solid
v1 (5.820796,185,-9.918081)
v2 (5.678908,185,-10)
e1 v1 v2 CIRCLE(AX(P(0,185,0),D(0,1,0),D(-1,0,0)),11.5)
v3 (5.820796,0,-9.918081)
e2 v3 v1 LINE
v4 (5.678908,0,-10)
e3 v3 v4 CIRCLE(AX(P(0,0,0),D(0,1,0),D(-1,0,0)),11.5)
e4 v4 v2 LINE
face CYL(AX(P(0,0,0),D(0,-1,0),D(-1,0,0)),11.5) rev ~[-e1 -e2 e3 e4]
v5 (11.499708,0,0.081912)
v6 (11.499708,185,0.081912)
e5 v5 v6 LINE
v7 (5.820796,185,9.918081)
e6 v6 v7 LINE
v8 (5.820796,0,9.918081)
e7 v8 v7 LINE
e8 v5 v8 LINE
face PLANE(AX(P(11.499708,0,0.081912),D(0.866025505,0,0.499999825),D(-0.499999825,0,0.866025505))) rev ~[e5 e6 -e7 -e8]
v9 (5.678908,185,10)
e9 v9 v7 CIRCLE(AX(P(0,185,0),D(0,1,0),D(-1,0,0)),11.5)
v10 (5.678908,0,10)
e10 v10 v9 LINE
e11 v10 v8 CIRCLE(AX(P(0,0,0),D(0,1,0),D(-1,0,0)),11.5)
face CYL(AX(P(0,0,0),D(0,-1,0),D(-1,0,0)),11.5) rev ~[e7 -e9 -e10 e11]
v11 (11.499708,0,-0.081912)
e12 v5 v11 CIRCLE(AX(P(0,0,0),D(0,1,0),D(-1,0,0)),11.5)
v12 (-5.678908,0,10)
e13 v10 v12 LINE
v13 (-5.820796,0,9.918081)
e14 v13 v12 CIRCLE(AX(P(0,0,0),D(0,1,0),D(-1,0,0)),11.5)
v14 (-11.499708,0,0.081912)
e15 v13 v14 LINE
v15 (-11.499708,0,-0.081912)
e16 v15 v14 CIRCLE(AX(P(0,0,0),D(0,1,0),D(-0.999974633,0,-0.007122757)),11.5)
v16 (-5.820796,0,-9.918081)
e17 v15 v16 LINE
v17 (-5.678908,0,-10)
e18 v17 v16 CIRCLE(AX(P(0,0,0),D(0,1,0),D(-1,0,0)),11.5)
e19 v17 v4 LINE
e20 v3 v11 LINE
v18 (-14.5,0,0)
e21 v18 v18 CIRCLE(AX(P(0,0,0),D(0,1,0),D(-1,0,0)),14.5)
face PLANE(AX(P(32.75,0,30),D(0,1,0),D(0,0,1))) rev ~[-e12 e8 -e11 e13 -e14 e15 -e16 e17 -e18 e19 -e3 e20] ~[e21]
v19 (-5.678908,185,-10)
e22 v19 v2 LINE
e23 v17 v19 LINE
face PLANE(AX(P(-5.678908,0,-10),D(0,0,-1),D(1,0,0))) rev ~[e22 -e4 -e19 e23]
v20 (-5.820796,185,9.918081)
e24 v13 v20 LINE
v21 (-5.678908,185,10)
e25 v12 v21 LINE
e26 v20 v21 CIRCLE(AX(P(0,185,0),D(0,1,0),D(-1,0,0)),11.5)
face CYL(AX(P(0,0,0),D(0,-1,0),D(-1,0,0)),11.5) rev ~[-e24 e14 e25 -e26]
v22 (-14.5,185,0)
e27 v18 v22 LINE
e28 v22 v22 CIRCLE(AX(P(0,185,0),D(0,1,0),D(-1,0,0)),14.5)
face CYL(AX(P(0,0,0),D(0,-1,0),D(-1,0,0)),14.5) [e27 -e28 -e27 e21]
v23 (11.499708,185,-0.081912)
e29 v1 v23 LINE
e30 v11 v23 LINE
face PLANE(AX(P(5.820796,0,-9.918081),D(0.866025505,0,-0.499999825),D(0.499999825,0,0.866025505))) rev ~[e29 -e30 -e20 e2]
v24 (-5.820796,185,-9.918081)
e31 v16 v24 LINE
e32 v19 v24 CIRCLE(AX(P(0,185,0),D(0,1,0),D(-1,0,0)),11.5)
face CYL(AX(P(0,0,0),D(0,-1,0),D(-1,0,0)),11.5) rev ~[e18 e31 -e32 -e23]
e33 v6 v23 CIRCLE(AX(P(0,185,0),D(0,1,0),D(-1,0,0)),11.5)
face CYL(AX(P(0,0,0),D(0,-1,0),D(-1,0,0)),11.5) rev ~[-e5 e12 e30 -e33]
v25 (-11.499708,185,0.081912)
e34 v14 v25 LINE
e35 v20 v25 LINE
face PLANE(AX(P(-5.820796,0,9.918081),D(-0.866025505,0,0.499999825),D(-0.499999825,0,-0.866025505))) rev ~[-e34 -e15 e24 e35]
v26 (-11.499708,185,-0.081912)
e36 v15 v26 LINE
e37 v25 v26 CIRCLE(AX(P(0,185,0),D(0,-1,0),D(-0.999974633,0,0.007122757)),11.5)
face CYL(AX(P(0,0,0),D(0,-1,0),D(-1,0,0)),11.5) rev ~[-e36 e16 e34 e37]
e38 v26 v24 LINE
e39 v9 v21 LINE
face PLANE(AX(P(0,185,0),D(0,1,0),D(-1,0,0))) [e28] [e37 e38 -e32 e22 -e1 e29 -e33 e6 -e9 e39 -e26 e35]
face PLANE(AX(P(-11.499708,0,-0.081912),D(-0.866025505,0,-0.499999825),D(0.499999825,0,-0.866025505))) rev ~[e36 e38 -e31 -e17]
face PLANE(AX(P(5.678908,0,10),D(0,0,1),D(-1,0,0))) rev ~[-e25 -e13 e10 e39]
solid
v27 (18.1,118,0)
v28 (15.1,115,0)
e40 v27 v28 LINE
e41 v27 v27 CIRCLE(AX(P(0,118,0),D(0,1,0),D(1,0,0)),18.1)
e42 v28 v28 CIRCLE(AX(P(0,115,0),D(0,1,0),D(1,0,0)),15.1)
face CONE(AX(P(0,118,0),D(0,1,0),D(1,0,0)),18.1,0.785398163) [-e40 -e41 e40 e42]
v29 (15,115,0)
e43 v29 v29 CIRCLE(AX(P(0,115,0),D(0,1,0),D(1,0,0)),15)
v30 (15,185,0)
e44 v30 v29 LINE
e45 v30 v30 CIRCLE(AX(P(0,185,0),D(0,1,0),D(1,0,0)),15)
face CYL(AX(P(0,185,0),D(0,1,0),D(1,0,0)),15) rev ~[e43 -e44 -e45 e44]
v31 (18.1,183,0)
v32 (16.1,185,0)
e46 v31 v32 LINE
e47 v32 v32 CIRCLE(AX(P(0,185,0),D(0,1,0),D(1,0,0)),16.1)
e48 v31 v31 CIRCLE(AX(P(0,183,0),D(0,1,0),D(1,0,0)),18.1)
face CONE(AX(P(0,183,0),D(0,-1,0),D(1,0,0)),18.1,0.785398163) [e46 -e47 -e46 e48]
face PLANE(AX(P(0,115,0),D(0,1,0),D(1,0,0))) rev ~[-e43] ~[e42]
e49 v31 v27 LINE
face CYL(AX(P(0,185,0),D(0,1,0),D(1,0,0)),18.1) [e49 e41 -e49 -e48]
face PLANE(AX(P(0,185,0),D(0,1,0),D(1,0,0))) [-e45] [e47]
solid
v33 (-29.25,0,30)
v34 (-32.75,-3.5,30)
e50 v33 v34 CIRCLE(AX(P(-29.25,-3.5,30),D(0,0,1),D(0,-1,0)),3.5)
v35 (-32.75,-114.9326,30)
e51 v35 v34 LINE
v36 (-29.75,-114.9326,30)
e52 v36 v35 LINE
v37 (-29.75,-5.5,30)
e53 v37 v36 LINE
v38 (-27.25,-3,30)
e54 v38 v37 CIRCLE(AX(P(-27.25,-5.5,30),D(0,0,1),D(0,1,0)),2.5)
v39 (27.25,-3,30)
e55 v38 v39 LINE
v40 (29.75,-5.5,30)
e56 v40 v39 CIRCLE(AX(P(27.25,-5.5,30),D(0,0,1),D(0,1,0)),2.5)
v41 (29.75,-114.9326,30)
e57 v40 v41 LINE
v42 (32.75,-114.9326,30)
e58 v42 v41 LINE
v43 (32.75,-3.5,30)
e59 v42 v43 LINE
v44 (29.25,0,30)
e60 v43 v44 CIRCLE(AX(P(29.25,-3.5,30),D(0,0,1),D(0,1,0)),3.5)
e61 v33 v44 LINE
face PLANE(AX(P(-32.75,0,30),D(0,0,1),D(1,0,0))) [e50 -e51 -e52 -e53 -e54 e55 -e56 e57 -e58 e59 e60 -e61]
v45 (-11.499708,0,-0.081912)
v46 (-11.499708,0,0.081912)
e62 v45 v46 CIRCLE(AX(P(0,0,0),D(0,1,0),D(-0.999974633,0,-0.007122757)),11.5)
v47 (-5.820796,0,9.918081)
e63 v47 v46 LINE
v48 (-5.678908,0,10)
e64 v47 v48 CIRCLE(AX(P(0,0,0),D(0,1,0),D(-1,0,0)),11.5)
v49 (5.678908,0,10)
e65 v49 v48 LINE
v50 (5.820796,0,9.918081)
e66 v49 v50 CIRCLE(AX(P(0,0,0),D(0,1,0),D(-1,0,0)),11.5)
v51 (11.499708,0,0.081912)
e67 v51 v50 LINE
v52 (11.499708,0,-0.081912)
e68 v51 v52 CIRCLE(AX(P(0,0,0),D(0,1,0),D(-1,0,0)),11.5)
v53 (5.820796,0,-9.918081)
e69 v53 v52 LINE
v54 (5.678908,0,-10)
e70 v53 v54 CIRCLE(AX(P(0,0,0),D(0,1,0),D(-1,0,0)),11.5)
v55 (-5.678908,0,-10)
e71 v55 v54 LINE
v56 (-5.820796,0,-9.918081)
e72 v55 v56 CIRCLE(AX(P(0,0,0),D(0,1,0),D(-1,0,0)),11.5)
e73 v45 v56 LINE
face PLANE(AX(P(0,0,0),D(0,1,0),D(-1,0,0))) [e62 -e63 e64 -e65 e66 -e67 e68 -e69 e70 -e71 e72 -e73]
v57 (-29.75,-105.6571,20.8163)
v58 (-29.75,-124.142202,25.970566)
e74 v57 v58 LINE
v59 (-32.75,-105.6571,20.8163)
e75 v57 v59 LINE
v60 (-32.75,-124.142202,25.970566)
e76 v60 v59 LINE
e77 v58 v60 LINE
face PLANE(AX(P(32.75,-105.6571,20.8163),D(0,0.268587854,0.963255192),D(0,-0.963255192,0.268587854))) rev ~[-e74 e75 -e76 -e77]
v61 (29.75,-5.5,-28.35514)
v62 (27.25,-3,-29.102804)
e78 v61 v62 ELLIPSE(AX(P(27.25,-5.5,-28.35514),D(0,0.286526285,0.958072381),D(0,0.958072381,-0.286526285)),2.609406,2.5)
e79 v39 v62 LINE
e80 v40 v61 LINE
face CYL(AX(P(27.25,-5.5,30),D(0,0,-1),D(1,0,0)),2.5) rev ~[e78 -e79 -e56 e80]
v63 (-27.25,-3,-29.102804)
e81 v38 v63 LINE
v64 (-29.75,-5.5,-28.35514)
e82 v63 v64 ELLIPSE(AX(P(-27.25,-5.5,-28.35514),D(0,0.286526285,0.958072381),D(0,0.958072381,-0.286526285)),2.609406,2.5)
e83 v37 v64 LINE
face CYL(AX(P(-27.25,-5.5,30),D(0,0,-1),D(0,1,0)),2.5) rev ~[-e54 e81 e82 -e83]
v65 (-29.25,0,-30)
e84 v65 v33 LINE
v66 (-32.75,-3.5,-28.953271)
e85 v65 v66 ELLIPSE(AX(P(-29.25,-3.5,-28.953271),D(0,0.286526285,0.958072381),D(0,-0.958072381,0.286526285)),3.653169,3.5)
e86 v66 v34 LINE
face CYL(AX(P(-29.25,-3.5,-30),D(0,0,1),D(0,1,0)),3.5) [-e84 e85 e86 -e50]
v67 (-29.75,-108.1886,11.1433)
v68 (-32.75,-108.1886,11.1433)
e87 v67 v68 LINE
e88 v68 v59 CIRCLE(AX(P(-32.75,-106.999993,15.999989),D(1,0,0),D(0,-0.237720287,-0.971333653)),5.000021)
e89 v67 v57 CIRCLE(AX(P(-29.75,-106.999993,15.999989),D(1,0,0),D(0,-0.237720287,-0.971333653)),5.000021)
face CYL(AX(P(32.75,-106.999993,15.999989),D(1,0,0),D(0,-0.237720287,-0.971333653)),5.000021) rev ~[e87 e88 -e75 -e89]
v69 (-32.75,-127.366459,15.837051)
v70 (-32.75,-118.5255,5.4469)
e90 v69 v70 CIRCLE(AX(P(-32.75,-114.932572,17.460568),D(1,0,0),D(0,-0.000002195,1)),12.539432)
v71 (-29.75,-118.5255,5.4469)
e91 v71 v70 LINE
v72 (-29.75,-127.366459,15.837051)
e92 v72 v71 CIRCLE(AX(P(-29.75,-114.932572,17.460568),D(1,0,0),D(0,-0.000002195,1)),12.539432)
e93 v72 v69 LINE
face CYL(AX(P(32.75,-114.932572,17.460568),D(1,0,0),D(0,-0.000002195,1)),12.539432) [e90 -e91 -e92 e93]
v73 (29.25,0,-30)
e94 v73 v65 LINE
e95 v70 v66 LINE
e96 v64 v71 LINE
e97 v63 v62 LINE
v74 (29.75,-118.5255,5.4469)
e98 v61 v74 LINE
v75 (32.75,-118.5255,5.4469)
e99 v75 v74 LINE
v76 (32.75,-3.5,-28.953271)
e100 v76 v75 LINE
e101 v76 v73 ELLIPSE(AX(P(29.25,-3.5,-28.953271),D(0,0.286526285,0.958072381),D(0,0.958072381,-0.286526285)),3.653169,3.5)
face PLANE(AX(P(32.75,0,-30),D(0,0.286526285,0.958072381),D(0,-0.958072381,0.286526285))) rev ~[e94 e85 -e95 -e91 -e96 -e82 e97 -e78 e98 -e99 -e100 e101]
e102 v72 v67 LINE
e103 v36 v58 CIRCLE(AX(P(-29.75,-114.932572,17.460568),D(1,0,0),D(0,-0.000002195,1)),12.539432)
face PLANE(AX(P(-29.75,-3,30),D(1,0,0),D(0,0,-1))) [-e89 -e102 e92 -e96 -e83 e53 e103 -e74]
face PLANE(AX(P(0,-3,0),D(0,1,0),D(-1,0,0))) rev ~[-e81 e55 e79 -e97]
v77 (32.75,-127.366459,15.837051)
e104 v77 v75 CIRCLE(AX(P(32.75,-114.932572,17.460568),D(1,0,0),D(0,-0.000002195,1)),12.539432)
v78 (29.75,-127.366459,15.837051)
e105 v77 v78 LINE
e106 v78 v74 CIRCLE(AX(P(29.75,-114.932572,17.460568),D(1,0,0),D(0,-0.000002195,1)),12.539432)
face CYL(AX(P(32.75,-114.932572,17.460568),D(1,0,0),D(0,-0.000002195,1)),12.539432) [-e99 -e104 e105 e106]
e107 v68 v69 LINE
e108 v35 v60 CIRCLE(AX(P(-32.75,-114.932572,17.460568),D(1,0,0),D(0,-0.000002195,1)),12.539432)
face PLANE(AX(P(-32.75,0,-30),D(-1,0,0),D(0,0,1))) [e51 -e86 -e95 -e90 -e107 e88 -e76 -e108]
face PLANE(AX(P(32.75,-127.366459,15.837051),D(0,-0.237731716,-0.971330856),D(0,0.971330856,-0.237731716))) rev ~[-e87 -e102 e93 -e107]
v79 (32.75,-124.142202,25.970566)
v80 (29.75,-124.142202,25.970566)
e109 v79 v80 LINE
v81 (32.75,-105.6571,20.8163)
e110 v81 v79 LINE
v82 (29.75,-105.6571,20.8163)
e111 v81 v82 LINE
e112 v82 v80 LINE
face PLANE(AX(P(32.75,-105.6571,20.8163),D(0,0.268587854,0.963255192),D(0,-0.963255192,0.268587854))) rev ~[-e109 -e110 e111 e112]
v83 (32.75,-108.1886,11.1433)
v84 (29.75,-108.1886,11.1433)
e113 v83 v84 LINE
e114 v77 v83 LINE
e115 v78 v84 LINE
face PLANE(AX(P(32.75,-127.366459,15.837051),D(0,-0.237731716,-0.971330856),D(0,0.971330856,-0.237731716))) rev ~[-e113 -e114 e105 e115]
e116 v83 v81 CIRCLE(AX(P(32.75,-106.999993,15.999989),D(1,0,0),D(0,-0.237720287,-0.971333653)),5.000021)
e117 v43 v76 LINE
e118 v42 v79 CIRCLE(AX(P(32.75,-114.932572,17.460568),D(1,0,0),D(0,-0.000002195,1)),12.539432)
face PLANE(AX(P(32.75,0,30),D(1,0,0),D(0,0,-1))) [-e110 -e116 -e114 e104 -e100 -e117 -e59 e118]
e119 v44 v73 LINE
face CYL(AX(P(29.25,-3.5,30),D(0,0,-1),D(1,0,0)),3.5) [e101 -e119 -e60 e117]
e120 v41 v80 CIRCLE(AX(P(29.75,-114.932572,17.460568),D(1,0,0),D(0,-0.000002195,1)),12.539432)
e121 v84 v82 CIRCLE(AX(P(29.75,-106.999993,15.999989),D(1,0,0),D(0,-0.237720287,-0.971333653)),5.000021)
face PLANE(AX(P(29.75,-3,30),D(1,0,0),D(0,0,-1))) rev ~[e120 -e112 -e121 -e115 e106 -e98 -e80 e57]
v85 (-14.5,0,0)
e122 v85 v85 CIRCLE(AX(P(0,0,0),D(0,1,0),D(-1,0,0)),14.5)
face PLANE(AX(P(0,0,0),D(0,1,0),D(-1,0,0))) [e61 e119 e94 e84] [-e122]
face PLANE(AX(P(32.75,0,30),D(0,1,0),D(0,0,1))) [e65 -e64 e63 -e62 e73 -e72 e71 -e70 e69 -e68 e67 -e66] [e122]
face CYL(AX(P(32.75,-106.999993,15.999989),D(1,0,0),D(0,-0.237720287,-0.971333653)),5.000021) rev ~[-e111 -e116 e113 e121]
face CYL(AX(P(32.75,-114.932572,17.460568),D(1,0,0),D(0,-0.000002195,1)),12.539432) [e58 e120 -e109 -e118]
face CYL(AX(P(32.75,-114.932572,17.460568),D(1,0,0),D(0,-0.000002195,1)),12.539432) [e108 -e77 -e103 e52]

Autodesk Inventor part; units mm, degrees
ref_plane "YZ Plane" through (0, 0, 0) normal (1, 0, 0) x (0, 1, 0)
ref_plane "XZ Plane" through (0, 0, 0) normal (0, 1, 0) x (-1, 0, 0)
ref_plane "XY Plane" through (0, 0, 0) normal (0, 0, 1) x (1, 0, 0)
sketch "Sketch1" plane through (0, 0, 0) normal (0, 1, 0) x (-1, 0, 0)
  line L0 (32.75, 30) -> (-32.75, 30)
  line L1 (-32.75, 30) -> (-32.75, -30)
  line L2 (-32.75, -30) -> (32.75, -30)
  line L3 (32.75, -30) -> (32.75, 30)
  line L4 (32.75, 30) -> (-32.75, -30) construction
  line L5 (-32.75, 30) -> (32.75, -30) construction
  line L6 (-5.7735, -10) -> (-11.547, 0)
  line L7 (-11.547, 0) -> (-5.7735, 10)
  line L8 (-5.7735, 10) -> (5.7735, 10)
  line L9 (5.7735, 10) -> (11.547, 0)
  line L10 (11.547, 0) -> (5.7735, -10)
  line L11 (5.7735, -10) -> (-5.7735, -10)
  circle A0 centre (0, 0) radius 14.5
  circle A1 centre (0, 0) radius 11.5
  point P0 (0, 10)
  point P1 (11.4997, -0.0819)
  point P2 (5.8208, -9.9181)
  point P3 (5.6789, -10)
  point P4 (-5.6789, -10)
  point P5 (-5.8208, -9.9181)
  point P6 (-11.4997, -0.0819)
  point P7 (-11.4997, 0.0819)
  point P8 (-5.8208, 9.9181)
  point P9 (-5.6789, 10)
  point P10 (5.6789, 10)
  point P11 (5.8208, 9.9181)
  point P12 (11.4997, 0.0819)
  dimension "d1" = 65.5
  dimension "d2" = 60
  dimension "d3" = 20
  dimension "d31" = 29
  dimension "d32" = 3
extrude "Extrusion1" add sketch "Sketch1" against normal blind 3 contours L3 L2 L1 L0 | L6 A1 L11 | A1 L6 | L6 A1 L7 L8 L9 L10 L11 | L11 A1 | L6 L7 A1 | A1 L10 L11 | A1 L7 | L10 A1 | L7 L8 A1 | A1 L9 L10 | A1 L8 | L8 L9 A1 | L9 A1 | A0
ref_plane "Work Plane1" through (0, -3, 0) normal (0, -1, 0) x (1, 0, 0)
sketch "Sketch3" plane through (0, -3, 0) normal (0, -1, 0) x (1, 0, 0)
  line L0 (32.75, -30) -> (32.75, 30) projected
  line L1 (32.75, 30) -> (-32.75, 30) projected
  line L2 (-32.75, 30) -> (-32.75, -30) projected
  line L3 (-32.75, -30) -> (32.75, -30) projected
  line L4 (29.75, 30) -> (29.75, -30)
  line L5 (0, 0) -> (0, -7) construction
  line L6 (-29.75, 30) -> (-29.75, -30)
  dimension "d13" = 3
extrude "Extrusion4" add sketch "Sketch3" along normal blind 127 contours L3 L4 L1 L0 | L3 L2 L1 L6
sketch "Sketch4" plane through (32.75, 0, 30) normal (1, 0, 0) x (0, 0, -1)
  line L0 (0, 0) -> (60, 0) projected
  line L1 (0, 0) -> (0, -130) projected
  line L2 (60, -130) -> (0, -130) projected
  line L3 (60, 0) -> (60, -130) projected
  line L4 (0, 0) -> (60, 0) projected
  line L5 (60, 0) -> (21.1215, -130)
  arc A0 (18.8567, -108.1886) -> (9.1837, -105.6571) centre (14, -107) ccw
  line L6 (14, -107) -> (28, -107) construction
  line L7 (0, 0) -> (0, -130) projected
  line L8 (9.1837, -105.6571) -> (2, -131.4205)
  line L9 (2, -131.4205) -> (12.5394, -134)
  line L10 (12.5394, -134) -> (18.8567, -108.1886)
  arc A1 (0, -114.9326) -> (24.5531, -118.5255) centre (12.5394, -114.9326) ccw
  point P0 (30, 0)
  point P1 (14.163, -127.3665)
  point P2 (4.0294, -124.1422)
  point P3 (2.3961, -130)
  point P4 (13.5184, -130)
  dimension "d16" = 130
  dimension "d18" = 10
  dimension "d19" = 107
  dimension "d20" = 14
  dimension "d23" = 14
extrude "Extrusion5" cut sketch "Sketch4" against normal blind 127 contours L3 L2 L5 | A1 L8 L2 L1 | L5 L2 L10 A1 | A1 L10 L2 L8 | L8 A0 L10 A1 | L2 L10 L9 L8
extrude "Extrusion6" add sketch "Sketch1" along normal blind 185 contours L6 A1 L11 | A1 L6 | L11 A1 | L6 L7 A1 | A1 L10 L11 | A1 L7 | L10 A1 | L7 L8 A1 | A1 L9 L10 | A1 L8 | L8 L9 A1 | L9 A1 | A0
sketch "Sketch5" plane through (0, 185, 0) normal (0, 1, 0) x (1, 0, 0)
  circle A0 centre (0, 0) radius 15
  circle A1 centre (0, 0) radius 18.1
  circle A2 centre (0, 0) radius 14.5 projected
  dimension "d35" = 36.2
  dimension "d36" = 0.5
extrude "Extrusion7" add sketch "Sketch5" against normal blind 70 contours A1
chamfer "Chamfer1" distance 2 angle 45 1 edges at (-18.1, 185, 0)
chamfer "Chamfer2" distance 3 angle 45 1 edges at (-18.1, 115, 0)
fillet "Fillet1" radius 2.5 2 edges at (-29.75, -3, 0.4486) (29.75, -3, 0.4486)
fillet "Fillet2" radius 3.5 2 edges at (-32.75, 0, 0) (32.75, 0, 0)
ref_plane "Work Plane2" through (32.75, 0, 30) normal (0, 1, 0) x (0, 0, -1)
split body "Split1" result two bodies by plane through (32.75, 0, 30) normal (0, 1, 0) first body at (-13.8187, 123.3333, -2.2458) (17.5429, 139.6667, 1.4162)
thread "Thread4" size "M30x3.5" class "6g" standard "ANSI Metric M Profile" length 25
equation "\"d23\" = d20"
properties part number "frontwheelFork"
